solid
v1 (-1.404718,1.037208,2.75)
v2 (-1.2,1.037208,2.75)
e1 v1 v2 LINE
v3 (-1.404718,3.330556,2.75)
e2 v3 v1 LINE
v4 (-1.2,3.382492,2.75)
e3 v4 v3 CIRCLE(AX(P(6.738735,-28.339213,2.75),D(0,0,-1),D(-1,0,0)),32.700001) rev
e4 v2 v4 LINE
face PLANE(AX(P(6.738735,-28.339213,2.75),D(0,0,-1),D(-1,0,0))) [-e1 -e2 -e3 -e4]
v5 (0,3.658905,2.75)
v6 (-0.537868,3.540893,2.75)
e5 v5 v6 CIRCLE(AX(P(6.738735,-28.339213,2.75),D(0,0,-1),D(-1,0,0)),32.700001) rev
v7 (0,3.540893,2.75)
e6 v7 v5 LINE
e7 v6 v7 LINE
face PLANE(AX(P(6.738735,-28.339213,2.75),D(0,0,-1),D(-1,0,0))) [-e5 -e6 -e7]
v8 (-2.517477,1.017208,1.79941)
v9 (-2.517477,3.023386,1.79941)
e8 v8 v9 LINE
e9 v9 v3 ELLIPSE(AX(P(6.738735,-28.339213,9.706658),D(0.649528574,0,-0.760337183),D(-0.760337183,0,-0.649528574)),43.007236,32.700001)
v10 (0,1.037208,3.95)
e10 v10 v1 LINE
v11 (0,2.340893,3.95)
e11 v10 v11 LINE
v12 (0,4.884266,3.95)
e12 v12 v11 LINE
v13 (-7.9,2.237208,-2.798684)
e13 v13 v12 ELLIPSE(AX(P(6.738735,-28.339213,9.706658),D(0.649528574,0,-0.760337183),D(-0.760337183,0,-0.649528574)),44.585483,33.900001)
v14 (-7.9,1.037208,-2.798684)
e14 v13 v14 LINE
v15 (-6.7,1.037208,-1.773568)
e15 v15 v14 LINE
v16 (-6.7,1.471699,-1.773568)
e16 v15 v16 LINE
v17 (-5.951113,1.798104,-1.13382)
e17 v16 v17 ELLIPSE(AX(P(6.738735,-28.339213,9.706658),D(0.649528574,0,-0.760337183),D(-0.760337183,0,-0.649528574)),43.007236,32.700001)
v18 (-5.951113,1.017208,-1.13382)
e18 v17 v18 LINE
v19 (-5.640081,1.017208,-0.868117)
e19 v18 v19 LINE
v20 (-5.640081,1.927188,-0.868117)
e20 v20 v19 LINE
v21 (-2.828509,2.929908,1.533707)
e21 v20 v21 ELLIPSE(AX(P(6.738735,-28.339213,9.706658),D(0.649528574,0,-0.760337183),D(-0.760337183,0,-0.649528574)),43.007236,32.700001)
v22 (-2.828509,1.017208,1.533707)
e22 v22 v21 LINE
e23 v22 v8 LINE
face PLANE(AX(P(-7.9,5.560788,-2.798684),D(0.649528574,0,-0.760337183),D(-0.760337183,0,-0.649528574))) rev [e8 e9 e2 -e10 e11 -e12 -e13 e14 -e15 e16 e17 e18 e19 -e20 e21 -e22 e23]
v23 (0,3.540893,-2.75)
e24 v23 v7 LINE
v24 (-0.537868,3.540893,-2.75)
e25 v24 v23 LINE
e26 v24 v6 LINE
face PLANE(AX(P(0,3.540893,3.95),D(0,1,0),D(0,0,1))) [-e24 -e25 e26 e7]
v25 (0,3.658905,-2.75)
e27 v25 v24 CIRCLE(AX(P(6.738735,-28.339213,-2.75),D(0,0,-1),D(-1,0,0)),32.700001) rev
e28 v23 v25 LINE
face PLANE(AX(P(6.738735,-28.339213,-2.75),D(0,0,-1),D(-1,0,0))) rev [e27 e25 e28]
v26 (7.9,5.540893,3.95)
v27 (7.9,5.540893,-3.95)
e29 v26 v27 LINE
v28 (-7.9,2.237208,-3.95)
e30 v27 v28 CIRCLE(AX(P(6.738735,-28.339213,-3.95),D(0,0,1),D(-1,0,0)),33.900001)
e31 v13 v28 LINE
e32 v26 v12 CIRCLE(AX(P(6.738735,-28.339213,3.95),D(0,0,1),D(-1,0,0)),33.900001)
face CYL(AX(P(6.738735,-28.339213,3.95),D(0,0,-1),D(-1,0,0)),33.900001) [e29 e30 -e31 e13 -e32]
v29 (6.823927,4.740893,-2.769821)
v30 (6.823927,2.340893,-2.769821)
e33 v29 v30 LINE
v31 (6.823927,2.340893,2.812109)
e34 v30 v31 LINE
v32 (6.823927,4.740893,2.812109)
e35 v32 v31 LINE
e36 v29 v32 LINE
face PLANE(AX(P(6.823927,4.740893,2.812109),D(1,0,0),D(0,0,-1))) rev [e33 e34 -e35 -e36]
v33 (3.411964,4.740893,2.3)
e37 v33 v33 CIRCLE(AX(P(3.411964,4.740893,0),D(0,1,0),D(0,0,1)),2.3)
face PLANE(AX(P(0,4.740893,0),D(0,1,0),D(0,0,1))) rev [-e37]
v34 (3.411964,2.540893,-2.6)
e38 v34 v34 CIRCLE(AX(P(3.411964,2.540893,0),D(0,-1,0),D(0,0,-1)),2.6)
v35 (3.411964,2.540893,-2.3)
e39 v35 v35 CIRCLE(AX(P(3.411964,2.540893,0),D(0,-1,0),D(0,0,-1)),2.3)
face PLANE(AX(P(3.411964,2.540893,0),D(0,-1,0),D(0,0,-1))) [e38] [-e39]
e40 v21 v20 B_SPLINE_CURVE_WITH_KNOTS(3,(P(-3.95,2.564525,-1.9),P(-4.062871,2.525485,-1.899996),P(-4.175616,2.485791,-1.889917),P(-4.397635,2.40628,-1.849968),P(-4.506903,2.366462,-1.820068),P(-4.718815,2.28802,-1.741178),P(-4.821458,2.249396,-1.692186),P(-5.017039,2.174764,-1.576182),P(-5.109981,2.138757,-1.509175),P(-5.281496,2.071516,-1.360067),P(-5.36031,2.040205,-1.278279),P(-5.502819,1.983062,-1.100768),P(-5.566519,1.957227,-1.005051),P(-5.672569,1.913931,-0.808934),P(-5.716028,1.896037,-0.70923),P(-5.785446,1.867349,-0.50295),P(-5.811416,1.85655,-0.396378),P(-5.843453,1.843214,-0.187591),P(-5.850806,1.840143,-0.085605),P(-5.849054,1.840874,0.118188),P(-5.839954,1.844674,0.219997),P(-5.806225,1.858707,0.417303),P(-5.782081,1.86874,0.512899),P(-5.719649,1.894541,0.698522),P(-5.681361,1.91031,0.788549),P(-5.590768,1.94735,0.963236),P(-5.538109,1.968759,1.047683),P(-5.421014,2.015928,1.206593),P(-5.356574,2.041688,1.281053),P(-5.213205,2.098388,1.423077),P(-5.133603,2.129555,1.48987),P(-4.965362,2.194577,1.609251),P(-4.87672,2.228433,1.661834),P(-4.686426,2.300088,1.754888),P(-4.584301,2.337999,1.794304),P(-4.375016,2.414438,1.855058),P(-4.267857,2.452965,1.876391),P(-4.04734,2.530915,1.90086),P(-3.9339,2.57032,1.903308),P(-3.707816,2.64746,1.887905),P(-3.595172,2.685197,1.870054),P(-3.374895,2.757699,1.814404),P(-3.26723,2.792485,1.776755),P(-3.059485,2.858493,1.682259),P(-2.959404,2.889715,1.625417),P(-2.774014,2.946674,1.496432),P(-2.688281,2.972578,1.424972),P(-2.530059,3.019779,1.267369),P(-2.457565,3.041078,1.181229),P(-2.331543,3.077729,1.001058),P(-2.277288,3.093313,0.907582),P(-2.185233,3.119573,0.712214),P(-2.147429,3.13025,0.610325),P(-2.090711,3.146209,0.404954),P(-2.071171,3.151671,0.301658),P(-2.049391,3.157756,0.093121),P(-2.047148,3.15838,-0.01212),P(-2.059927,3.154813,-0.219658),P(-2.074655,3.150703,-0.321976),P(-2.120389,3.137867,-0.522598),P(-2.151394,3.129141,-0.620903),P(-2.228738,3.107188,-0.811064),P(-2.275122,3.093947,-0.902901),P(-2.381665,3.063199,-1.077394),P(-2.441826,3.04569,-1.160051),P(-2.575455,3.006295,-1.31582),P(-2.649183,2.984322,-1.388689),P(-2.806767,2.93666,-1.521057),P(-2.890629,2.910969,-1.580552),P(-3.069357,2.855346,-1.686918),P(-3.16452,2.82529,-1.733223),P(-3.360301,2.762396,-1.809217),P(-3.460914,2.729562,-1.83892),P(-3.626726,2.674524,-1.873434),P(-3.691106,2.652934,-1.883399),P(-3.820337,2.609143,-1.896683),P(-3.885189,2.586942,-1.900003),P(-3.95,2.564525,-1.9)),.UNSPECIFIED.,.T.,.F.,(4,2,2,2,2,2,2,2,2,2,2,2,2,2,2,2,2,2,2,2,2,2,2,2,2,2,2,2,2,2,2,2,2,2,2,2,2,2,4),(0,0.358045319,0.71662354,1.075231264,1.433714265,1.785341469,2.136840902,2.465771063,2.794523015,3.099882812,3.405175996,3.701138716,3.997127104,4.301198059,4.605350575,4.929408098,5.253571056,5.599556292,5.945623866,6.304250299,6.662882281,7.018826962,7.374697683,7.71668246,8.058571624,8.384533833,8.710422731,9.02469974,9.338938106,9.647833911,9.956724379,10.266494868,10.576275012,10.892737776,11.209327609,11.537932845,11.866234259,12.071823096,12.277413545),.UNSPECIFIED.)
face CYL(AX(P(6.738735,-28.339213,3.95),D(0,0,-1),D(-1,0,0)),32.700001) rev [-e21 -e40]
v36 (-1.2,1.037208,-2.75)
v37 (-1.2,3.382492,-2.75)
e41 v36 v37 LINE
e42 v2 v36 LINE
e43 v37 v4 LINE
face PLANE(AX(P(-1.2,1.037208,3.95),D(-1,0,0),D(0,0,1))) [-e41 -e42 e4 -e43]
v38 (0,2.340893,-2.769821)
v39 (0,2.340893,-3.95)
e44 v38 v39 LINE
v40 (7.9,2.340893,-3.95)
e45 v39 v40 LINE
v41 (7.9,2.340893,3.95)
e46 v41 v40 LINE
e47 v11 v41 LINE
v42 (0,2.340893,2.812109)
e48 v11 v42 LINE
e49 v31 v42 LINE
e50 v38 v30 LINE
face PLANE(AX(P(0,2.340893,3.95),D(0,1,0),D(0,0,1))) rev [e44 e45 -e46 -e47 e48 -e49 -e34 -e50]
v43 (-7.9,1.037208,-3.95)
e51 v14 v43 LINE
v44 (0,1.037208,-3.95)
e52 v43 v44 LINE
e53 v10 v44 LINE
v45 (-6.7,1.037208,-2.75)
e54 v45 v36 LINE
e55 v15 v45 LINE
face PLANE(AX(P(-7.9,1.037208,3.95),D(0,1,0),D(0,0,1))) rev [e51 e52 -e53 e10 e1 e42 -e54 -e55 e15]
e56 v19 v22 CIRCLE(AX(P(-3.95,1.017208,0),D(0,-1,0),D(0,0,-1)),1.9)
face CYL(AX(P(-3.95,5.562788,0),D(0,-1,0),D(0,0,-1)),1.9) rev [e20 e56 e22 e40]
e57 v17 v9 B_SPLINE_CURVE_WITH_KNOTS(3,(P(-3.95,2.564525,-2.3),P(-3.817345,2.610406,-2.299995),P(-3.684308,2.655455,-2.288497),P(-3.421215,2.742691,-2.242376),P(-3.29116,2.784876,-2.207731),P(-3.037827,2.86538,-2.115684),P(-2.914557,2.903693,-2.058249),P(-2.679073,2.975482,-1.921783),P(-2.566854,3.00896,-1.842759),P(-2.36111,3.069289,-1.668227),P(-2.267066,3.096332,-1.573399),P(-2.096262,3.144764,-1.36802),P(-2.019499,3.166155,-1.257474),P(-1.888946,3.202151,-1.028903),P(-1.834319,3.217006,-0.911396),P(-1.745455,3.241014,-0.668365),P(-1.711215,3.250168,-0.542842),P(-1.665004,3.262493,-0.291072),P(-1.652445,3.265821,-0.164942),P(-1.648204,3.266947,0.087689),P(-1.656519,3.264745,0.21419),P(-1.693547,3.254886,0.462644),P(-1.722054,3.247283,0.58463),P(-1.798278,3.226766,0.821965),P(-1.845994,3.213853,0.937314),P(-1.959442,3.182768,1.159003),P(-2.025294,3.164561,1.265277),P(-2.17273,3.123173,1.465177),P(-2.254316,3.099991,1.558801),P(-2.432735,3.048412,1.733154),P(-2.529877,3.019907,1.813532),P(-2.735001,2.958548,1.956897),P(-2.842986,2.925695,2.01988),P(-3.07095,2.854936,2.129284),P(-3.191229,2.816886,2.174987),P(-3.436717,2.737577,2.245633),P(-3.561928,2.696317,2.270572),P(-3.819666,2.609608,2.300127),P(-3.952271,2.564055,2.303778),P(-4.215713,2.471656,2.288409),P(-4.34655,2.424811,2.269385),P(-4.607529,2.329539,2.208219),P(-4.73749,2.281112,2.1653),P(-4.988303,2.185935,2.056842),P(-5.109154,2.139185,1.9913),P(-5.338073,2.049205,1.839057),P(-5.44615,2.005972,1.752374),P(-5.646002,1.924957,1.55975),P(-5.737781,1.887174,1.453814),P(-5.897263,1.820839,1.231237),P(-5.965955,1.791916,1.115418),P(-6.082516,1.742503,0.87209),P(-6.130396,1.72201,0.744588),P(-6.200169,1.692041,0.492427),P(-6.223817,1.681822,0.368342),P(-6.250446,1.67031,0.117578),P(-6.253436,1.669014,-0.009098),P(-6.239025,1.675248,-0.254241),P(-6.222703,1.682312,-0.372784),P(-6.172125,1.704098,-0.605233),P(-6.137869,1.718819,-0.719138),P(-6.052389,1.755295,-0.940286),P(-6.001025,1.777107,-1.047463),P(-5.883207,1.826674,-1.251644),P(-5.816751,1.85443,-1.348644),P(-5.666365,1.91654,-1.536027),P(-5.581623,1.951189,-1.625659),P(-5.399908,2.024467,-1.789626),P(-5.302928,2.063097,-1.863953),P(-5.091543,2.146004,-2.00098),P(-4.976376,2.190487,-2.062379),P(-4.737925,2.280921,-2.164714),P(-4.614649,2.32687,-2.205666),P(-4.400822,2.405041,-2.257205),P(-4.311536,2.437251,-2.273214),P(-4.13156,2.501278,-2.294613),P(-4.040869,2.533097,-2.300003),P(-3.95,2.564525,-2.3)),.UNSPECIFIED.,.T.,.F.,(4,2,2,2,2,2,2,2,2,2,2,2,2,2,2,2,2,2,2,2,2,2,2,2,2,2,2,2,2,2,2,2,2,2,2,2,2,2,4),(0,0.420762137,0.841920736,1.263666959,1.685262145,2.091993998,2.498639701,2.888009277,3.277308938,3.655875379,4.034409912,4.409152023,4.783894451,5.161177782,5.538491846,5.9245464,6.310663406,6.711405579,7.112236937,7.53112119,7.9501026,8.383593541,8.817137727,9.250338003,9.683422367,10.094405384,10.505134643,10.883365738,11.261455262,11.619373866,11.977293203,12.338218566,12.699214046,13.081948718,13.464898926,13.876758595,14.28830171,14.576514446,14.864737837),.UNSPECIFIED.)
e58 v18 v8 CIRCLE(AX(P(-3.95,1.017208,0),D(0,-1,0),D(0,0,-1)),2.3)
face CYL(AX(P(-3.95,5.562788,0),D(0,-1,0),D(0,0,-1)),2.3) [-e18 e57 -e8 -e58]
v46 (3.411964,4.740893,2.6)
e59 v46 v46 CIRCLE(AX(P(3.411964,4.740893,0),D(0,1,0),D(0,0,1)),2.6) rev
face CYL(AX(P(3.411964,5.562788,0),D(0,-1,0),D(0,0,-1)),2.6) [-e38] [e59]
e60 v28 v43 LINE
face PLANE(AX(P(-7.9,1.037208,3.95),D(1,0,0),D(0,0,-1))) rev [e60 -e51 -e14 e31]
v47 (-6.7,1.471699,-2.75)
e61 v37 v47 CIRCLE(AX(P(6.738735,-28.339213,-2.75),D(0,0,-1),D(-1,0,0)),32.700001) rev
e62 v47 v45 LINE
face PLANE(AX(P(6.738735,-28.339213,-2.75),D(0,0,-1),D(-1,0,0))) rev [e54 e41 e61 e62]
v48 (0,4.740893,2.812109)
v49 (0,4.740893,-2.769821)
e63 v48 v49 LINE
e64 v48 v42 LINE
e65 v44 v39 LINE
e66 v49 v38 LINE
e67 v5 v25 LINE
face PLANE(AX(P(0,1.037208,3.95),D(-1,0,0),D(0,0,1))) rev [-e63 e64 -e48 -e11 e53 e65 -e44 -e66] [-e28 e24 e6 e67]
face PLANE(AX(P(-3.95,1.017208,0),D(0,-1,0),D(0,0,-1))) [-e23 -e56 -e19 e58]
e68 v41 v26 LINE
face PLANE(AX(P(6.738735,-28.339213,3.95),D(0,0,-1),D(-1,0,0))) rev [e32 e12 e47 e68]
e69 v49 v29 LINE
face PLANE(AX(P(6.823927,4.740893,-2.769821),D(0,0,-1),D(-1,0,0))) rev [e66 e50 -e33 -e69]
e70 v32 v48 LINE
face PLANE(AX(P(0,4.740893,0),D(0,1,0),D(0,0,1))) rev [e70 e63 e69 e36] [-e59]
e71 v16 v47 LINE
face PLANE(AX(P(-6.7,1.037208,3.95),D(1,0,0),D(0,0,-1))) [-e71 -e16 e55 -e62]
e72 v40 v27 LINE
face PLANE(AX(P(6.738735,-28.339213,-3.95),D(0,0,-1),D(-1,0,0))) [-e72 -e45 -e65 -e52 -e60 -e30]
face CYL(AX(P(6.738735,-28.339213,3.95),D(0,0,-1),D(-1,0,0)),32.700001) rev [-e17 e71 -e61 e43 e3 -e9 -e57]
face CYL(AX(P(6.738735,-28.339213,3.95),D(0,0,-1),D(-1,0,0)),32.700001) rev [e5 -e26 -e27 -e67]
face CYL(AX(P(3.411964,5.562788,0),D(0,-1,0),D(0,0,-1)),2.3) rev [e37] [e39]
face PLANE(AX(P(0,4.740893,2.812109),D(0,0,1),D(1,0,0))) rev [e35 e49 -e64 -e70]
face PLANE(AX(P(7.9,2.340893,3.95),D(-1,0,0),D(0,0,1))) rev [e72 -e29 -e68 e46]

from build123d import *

# Parameters (mm, degrees)
BOSS_EXTRUDE1_DEPTH      = 3.95
SHELL1_START             = -2.75
SHELL1_DEPTH             = 5.5
BOSS_EXTRUDE2_REACH      = 11.943
BOSS_EXTRUDE2_END_RADIUS = 32.700000868
BOSS_EXTRUDE2_START      = 0.02
SKETCH2_R                = 2.3
SKETCH2_R_2              = 1.9
SKETCH3_W                = 6.823927471
SKETCH3_H                = 5.581929969
CUT_EXTRUDE1_DEPTH       = 2.4
BOSS_EXTRUDE3_REACH      = 11.601
BOSS_EXTRUDE3_START      = -0.2
SKETCH4_R                = 2.6
SKETCH4_R_2              = 2.3
CUT_EXTRUDE6_DEPTH       = 10.923471076
CUT_EXTRUDE6_DEPTH_BACK  = 10.923471076


with BuildPart() as part:
    # Sketch1 → Boss-Extrude1 (new, symmetric)
    with BuildSketch(Plane.XY):
        with BuildLine():
            Line((-7.9, 1.037208095), (0, 1.037208095))
            Line((0, 1.037208095), (0, 2.340892579))
            Line((0, 2.340892579), (7.9, 2.340892579))
            Line((7.9, 2.340892579), (7.9, 5.540892579))
            ThreePointArc((7.9, 5.540892579), (-0.199501968, 4.843176285), (-7.9, 2.237208095))
            Line((-7.9, 2.237208095), (-7.9, 1.037208095))
        make_face()
    extrude(amount=BOSS_EXTRUDE1_DEPTH, both=True)

    # Shell1: read off the stored shape, not the designer's step
    # Shell1 outline → Shell1 (cut)
    with BuildSketch(Plane.XY.offset(SHELL1_START)):
        with BuildLine():
            Line((-1.2, 1.037208095), (-1.2, 3.382492095))
            ThreePointArc((-1.2, 3.382492095), (-3.992613389, 2.549753458), (-6.7, 1.471699231))
            Line((-6.7, 1.471699231), (-6.7, 1.037208095))
            Line((-6.7, 1.037208095), (-1.2, 1.037208095))
        make_face()
        with BuildLine():
            ThreePointArc((6.7, 4.360765395), (3.058165542, 4.152993699), (-0.537868318, 3.540892579))
            Line((-0.537868318, 3.540892579), (6.7, 3.540892579))
            Line((6.7, 3.540892579), (6.7, 4.360765395))
        make_face()
    extrude(amount=SHELL1_DEPTH, mode=Mode.SUBTRACT)

    # Boss-Extrude2: up to this cylinder (the profile starts inside it)
    boss_extrude2_end = Plane(origin=(6.738734935, -28.339212532, 2.234946), z_dir=(0, 0, -1)) * Cylinder(BOSS_EXTRUDE2_END_RADIUS, 90.286001737, mode=Mode.PRIVATE)
    # Sketch2 → Boss-Extrude2 (add, up to the surface)
    with BuildSketch(Plane(origin=(0, 1.037208095, 0), x_dir=(-1, 0, 0), z_dir=(0, -1, 0)).offset(BOSS_EXTRUDE2_START), mode=Mode.PRIVATE) as boss_extrude2_sk1:
        with Locations(Location((3.95, 0, 0), (0, 0, 90))):
            Circle(SKETCH2_R)
        with Locations(Location((3.95, 0, 0), (0, 0, 90))):
            Circle(SKETCH2_R_2, mode=Mode.SUBTRACT)
    boss_extrude2_tool1 = extrude(boss_extrude2_sk1.sketch, amount=-BOSS_EXTRUDE2_REACH, mode=Mode.PRIVATE) & boss_extrude2_end
    add(boss_extrude2_tool1.solids().sort_by_distance((-3.95, 1.017208, 2.234946))[0])

    # Sketch3 → Cut-Extrude1 (cut)
    with BuildSketch(Plane.XZ.offset(-2.340892579)):
        with Locations((3.411963736, 0.021143674)):
            Rectangle(SKETCH3_W, SKETCH3_H)
    extrude(amount=-CUT_EXTRUDE1_DEPTH, mode=Mode.SUBTRACT)

    # Sketch4 → Boss-Extrude3 (add, up to next)
    with BuildSketch(Plane(origin=(0, 2.340892579, 0), x_dir=(-1, 0, 0), z_dir=(0, -1, 0)).offset(BOSS_EXTRUDE3_START), mode=Mode.PRIVATE) as boss_extrude3_sk1:
        with Locations(Location((-3.411963735, 0, 0), (0, 0, 90))):
            Circle(SKETCH4_R)
        with Locations(Location((-3.411963735, 0, 0), (0, 0, 90))):
            Circle(SKETCH4_R_2, mode=Mode.SUBTRACT)
    boss_extrude3_tool1 = extrude(boss_extrude3_sk1.sketch, amount=-BOSS_EXTRUDE3_REACH, mode=Mode.PRIVATE) - part.part
    add(boss_extrude3_tool1.solids().sort_by_distance((3.411964, 2.540893, 2.526461))[0])

    # Sketch10 → Cut-Extrude6 (cut, two sides: drawn at the far end of the back side and taken through both)
    with BuildSketch(Plane(origin=(0, 1.037208095, 0), x_dir=(-1, 0, 0), z_dir=(0, -1, 0)).offset(-CUT_EXTRUDE6_DEPTH_BACK)):
        Polygon((7.9, 2.798684465), (0, -3.95), (7.9, -3.95), align=None)
    extrude(amount=CUT_EXTRUDE6_DEPTH + CUT_EXTRUDE6_DEPTH_BACK, mode=Mode.SUBTRACT)


solid = part.part
